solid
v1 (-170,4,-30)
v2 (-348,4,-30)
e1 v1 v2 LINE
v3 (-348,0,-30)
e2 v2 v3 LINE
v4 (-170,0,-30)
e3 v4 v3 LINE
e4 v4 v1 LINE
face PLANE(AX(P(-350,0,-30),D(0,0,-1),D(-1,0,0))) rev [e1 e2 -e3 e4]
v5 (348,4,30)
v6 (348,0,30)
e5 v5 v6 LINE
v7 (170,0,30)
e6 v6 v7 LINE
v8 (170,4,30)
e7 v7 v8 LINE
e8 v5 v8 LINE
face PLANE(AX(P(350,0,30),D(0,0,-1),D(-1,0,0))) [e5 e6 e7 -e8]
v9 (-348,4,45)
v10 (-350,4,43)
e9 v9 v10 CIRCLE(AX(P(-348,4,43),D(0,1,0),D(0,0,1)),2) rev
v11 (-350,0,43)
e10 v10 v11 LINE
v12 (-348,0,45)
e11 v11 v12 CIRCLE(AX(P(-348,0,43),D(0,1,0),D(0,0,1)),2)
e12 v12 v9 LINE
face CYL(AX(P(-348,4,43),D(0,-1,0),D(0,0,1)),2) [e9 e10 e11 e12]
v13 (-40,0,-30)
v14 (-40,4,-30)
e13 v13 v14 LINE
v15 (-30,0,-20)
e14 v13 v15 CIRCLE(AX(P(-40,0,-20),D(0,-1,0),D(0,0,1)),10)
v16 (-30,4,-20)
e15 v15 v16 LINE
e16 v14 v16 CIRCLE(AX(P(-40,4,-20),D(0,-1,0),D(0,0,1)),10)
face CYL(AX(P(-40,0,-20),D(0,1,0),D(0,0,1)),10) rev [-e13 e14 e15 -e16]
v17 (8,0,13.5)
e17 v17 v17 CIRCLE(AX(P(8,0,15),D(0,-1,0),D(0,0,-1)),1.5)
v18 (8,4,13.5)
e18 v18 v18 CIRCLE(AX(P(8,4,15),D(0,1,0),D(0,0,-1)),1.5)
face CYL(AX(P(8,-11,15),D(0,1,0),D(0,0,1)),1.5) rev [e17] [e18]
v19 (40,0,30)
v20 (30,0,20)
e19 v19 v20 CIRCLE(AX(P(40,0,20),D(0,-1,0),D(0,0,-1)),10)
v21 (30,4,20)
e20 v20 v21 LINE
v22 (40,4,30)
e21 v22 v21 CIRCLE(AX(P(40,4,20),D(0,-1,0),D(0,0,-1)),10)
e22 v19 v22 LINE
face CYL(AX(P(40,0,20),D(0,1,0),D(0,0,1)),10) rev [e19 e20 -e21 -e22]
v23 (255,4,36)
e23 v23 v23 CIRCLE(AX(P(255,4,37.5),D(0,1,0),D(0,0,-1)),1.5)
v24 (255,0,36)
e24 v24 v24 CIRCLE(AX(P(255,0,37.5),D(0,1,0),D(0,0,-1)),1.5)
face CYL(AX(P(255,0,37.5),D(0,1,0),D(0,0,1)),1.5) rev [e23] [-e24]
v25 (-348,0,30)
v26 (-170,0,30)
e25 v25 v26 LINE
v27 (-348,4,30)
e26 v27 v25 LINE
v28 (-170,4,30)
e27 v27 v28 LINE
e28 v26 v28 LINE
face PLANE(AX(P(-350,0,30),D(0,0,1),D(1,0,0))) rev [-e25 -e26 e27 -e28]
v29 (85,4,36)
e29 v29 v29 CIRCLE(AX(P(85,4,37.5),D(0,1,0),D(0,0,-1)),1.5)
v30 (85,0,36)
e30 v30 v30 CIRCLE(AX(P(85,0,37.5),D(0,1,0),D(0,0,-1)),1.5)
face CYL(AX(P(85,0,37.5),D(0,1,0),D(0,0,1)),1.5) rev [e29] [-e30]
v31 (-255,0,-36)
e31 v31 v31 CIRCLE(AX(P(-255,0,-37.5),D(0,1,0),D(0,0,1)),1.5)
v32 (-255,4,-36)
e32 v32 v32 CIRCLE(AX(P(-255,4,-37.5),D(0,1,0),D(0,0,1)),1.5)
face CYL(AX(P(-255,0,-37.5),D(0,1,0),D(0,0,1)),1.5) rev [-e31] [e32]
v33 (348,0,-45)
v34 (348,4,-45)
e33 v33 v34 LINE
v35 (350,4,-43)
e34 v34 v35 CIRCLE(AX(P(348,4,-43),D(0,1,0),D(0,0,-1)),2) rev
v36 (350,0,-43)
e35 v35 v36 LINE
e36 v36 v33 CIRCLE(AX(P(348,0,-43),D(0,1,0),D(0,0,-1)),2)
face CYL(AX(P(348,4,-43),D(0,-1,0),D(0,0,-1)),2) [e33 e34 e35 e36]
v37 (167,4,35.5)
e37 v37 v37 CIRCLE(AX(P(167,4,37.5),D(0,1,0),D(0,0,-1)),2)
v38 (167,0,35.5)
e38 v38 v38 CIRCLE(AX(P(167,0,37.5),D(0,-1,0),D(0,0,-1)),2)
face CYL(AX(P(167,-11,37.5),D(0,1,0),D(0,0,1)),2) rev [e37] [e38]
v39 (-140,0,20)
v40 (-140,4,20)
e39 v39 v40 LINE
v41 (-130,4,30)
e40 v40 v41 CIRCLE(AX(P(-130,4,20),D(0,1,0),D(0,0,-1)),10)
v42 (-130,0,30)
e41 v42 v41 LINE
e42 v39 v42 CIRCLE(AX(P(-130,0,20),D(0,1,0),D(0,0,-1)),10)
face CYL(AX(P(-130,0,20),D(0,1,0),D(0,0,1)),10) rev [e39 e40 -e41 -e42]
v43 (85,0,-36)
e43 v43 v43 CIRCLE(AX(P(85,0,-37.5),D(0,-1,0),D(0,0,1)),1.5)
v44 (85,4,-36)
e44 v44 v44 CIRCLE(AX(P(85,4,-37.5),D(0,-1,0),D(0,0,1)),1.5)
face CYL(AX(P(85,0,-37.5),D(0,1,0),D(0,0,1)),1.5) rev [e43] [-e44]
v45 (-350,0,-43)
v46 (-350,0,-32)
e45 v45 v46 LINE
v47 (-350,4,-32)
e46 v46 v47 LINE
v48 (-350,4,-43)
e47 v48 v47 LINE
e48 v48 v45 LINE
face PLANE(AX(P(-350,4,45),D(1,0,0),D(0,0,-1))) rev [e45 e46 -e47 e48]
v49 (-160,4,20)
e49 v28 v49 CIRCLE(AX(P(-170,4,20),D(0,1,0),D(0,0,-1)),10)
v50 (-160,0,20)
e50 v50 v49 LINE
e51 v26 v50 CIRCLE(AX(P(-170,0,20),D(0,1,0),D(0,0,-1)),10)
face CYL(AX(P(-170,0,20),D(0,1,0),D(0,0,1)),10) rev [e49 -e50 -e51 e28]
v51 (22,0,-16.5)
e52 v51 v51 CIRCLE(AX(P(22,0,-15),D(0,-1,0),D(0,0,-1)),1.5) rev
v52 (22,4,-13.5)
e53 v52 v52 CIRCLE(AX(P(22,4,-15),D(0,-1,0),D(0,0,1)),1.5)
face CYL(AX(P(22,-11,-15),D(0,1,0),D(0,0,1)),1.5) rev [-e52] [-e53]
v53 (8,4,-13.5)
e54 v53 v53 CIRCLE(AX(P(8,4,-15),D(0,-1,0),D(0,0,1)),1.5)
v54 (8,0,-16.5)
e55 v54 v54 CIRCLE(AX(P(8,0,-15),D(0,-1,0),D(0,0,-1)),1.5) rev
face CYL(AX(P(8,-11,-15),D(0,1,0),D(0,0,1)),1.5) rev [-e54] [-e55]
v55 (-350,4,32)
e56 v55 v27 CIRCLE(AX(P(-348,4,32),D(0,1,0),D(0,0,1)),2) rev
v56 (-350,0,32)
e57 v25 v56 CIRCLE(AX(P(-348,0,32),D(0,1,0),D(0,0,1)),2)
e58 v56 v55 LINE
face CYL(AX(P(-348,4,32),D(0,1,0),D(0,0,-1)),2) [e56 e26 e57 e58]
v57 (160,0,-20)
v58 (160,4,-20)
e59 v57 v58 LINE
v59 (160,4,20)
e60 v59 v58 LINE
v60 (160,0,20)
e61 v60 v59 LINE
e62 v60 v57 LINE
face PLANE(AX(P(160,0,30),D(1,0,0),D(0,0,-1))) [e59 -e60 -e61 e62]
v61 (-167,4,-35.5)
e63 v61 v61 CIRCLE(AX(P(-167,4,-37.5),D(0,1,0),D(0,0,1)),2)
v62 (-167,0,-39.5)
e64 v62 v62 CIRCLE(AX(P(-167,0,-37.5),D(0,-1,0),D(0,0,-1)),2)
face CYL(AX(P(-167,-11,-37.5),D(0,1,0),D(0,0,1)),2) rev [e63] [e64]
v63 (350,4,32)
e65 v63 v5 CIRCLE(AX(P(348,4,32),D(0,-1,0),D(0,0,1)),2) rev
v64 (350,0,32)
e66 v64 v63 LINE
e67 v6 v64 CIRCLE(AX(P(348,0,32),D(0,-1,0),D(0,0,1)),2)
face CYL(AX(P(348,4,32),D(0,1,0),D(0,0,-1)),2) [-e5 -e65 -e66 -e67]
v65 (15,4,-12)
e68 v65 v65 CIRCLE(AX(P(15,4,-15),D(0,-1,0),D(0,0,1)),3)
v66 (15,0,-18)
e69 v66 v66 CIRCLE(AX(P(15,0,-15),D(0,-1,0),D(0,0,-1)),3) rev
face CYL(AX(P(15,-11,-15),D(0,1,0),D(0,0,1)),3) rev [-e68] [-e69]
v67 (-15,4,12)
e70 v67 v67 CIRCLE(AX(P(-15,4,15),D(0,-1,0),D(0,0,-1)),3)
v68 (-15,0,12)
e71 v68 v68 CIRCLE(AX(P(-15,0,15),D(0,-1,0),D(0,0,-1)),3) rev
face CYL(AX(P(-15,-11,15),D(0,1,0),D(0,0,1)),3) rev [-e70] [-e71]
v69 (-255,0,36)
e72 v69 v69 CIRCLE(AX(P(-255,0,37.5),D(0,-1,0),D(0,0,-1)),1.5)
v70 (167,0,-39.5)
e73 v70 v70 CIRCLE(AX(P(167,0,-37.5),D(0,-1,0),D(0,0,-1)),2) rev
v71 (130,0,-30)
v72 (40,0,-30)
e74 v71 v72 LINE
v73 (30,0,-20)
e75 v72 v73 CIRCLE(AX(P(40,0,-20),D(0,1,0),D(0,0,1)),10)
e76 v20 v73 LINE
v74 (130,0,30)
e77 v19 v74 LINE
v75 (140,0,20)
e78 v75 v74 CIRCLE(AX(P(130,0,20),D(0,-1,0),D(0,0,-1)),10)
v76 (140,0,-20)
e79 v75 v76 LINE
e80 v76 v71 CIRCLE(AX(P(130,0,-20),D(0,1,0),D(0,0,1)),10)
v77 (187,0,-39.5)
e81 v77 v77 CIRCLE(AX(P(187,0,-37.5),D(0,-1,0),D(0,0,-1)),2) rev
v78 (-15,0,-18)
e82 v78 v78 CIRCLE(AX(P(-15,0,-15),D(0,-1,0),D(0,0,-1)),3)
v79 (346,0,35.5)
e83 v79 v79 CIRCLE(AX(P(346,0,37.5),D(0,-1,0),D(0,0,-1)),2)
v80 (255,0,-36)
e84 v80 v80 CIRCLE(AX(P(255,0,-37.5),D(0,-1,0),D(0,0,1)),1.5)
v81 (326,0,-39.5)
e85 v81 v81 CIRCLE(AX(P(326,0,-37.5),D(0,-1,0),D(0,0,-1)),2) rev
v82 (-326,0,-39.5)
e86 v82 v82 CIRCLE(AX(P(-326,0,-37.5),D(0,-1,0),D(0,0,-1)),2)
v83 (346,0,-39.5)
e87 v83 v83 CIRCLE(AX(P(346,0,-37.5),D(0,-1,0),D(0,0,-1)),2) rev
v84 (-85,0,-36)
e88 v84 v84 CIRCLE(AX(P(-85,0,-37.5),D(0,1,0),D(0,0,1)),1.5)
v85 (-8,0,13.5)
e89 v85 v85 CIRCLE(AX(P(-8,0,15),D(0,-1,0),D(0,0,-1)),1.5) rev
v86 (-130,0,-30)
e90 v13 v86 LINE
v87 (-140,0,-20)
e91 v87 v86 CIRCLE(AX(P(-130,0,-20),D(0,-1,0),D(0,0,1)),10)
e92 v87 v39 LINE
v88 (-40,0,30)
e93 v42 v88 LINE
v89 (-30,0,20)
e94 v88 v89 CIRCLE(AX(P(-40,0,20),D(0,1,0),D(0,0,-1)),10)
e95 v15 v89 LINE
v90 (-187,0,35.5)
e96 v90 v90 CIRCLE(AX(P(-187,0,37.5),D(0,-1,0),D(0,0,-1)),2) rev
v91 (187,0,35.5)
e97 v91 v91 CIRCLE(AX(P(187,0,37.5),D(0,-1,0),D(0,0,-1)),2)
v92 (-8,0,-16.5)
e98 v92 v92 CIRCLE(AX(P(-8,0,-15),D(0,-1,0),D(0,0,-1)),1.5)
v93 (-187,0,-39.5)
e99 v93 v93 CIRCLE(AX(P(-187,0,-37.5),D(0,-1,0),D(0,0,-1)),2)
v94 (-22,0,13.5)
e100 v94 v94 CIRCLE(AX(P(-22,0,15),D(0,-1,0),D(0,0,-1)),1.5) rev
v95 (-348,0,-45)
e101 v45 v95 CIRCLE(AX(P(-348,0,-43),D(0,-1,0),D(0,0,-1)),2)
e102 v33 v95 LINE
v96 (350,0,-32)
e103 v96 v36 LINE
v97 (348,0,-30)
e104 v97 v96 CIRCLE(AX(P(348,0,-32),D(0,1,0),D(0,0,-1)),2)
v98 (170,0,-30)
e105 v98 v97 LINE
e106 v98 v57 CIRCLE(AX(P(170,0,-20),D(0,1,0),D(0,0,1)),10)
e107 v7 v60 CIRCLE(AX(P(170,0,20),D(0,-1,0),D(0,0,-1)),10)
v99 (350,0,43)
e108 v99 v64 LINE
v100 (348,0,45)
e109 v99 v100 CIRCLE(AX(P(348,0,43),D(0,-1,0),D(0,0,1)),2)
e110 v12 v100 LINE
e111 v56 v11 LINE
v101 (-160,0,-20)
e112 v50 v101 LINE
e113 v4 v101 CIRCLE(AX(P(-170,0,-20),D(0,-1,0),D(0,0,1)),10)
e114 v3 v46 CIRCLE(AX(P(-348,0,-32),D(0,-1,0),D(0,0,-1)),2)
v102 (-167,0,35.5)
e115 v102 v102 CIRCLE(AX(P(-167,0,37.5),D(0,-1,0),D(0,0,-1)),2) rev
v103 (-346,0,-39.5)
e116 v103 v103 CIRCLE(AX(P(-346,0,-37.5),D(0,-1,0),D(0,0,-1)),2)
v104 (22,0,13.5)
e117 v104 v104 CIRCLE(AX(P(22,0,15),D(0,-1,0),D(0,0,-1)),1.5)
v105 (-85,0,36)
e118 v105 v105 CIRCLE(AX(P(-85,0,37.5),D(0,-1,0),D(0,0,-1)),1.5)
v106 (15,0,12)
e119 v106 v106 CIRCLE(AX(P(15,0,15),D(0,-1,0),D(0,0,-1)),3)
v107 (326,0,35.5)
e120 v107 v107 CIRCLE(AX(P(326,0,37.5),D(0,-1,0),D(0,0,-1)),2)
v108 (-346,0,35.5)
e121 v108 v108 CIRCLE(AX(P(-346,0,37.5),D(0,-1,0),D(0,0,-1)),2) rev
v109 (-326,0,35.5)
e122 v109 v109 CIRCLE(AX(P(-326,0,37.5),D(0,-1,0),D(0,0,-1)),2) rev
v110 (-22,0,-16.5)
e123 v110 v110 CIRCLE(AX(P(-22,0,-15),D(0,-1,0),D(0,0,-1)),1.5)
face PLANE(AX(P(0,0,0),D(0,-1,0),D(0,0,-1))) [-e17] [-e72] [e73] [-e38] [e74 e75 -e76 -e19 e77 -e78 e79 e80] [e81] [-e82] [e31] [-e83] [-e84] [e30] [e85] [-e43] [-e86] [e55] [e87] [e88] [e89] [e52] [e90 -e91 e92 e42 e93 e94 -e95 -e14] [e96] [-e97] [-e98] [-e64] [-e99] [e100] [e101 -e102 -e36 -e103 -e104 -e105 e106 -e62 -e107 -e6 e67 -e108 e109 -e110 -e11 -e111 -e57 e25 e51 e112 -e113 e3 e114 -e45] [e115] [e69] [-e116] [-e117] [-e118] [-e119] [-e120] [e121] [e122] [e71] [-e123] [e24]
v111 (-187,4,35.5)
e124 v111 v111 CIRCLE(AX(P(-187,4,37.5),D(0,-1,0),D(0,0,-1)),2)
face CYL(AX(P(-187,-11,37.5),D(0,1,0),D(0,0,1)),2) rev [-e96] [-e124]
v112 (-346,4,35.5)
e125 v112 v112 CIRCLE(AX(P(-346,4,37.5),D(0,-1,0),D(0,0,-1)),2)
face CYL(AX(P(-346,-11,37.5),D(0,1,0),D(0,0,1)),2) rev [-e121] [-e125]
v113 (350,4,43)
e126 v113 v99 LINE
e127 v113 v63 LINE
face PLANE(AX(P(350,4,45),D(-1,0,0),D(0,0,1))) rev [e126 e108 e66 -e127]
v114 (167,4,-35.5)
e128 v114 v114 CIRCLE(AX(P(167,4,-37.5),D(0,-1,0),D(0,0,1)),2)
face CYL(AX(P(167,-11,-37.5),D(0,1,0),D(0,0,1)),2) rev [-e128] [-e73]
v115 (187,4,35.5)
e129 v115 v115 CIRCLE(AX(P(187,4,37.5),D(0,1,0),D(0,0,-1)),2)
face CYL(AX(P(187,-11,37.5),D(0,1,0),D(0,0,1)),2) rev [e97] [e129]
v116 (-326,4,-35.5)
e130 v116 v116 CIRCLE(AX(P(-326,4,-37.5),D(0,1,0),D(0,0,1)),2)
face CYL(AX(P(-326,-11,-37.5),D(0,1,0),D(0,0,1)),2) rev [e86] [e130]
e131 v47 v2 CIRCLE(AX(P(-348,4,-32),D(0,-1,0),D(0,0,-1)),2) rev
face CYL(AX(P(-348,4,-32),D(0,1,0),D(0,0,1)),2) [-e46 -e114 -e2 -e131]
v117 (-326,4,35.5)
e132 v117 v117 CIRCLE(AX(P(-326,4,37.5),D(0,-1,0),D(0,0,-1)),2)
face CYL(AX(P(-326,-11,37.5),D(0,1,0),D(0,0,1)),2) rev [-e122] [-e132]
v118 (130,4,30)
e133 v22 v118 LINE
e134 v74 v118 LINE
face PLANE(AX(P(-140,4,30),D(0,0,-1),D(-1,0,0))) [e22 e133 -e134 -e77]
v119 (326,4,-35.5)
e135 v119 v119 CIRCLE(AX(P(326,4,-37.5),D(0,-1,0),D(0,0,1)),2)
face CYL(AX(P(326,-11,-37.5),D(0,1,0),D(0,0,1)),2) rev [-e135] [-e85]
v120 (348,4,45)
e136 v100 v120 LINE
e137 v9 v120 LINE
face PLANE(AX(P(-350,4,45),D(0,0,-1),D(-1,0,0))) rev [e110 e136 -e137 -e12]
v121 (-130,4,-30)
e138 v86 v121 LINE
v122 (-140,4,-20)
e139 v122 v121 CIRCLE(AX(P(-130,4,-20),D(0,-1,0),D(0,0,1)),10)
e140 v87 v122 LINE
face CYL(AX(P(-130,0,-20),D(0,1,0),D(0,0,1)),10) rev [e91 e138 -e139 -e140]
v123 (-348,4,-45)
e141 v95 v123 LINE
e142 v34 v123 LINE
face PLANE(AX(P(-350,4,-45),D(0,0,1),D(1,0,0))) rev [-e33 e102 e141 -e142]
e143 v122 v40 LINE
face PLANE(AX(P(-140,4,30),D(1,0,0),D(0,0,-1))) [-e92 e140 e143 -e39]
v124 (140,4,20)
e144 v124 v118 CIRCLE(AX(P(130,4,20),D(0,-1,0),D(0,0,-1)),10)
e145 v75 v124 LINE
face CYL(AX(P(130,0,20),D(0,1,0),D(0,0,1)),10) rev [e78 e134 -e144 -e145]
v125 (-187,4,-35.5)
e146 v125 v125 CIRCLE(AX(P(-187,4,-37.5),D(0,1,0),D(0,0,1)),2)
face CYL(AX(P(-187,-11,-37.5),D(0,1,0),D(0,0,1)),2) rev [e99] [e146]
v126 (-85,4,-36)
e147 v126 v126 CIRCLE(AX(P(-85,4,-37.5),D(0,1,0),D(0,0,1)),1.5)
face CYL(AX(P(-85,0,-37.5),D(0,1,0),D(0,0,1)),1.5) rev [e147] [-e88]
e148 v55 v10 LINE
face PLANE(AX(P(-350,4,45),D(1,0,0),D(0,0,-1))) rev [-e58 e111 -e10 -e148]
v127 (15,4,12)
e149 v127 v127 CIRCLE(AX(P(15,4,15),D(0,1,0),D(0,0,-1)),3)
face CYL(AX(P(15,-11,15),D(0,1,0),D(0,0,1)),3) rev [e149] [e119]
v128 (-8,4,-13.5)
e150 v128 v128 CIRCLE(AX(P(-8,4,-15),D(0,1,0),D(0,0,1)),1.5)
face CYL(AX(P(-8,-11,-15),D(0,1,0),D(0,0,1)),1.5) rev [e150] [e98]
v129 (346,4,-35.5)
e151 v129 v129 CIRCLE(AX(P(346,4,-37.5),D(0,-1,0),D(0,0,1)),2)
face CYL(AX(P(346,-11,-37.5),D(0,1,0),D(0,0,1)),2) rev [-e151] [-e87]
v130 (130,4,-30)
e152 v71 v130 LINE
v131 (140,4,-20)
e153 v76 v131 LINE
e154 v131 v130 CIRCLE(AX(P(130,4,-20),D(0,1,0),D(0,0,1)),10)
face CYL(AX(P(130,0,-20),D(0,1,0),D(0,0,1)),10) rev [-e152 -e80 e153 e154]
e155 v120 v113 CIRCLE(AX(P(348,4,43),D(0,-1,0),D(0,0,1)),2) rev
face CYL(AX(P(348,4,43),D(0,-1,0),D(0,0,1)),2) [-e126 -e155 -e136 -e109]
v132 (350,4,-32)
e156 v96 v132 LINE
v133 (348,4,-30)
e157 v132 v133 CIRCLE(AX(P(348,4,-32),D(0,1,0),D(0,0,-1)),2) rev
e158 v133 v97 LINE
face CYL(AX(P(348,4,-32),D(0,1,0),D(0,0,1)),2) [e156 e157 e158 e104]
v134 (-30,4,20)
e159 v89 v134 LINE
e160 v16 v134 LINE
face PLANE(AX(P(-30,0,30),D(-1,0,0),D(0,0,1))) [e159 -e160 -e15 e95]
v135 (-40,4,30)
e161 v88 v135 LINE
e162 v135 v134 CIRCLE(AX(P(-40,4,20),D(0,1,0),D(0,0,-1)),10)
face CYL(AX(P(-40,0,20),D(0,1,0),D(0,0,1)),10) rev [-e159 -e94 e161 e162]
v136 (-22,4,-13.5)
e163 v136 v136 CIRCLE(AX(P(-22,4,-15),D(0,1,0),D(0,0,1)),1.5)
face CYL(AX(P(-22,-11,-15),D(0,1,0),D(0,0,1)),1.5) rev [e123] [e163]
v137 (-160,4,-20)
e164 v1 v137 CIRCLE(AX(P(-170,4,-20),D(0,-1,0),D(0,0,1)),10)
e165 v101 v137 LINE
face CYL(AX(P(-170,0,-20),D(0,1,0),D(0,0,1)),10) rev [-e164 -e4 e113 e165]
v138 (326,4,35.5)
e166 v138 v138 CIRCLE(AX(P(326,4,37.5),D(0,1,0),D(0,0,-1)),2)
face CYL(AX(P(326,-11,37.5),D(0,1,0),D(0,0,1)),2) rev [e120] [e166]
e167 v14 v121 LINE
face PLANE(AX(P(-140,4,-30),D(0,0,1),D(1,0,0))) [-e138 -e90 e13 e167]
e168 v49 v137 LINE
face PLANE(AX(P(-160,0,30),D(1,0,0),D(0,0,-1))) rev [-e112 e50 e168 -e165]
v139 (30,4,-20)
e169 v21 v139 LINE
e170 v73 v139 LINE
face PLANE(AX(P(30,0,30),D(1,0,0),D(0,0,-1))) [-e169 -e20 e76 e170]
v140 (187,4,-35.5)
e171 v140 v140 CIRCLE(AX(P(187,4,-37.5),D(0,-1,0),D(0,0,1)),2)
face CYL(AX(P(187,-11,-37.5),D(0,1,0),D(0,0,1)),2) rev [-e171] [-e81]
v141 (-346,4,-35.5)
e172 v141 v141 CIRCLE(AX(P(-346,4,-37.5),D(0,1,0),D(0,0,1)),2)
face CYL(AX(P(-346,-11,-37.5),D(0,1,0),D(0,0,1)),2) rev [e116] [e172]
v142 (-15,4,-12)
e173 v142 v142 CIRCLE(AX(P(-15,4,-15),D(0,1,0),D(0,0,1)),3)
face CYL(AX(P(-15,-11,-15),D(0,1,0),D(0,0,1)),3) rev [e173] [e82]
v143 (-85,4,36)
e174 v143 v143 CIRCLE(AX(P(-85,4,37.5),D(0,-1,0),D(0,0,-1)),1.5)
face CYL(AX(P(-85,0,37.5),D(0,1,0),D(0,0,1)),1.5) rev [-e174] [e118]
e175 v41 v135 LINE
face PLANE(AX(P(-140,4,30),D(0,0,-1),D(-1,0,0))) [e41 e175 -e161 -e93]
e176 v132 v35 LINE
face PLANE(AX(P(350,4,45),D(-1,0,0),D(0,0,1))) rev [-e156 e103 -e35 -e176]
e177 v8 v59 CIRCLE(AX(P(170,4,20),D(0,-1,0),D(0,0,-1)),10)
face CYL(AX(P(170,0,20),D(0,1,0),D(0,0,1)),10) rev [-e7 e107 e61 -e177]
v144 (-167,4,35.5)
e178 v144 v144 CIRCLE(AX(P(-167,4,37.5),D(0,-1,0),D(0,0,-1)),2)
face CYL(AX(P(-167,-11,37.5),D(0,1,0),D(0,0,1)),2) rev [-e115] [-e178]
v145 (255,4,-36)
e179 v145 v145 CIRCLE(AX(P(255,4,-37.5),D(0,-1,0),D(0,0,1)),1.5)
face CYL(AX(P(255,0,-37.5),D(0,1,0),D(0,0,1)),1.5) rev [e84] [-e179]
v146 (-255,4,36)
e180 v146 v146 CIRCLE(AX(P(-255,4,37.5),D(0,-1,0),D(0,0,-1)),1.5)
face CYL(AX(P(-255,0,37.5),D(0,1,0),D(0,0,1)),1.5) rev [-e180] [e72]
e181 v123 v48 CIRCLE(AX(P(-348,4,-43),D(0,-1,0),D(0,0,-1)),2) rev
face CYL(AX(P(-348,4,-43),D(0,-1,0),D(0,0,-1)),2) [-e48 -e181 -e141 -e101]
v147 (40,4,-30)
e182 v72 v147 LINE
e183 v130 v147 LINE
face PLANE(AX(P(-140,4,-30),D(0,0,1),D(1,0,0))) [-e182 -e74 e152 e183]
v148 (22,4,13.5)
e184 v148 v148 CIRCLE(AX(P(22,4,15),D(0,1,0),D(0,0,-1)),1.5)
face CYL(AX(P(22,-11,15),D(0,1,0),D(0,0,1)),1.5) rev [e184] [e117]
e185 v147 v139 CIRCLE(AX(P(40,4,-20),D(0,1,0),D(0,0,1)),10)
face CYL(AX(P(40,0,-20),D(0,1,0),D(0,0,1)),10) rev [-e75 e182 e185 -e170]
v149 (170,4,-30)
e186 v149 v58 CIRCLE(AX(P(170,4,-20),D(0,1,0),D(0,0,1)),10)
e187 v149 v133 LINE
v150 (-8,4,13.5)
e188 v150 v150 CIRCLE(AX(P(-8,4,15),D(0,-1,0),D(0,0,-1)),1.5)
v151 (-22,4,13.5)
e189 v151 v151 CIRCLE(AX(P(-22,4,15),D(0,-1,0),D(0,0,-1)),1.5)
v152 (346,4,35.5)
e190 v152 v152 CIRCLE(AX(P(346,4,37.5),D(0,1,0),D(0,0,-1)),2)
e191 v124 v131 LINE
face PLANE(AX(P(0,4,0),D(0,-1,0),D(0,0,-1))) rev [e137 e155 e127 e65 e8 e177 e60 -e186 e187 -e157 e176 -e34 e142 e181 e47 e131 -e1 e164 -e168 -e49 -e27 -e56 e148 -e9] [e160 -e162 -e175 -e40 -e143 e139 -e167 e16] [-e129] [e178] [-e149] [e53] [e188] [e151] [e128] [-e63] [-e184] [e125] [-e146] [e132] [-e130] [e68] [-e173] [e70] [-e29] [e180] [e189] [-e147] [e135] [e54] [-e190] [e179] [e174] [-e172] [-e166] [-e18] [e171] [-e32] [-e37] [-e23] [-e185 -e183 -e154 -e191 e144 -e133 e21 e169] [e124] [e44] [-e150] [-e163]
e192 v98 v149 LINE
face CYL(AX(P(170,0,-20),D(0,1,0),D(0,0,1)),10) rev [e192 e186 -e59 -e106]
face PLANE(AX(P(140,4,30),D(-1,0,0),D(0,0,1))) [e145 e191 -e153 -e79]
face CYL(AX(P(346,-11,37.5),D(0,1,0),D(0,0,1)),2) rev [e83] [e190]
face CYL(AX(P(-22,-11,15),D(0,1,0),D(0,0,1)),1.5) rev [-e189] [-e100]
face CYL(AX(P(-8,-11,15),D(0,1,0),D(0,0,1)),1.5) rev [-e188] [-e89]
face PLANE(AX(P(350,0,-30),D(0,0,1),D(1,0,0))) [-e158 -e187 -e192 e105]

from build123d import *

# Parameters (mm, degrees)
SKETCH_1_W                                   = 700
SKETCH_1_H                                   = 90
SKETCH_1_W_2                                 = 280
SKETCH_1_H_2                                 = 60
EXTRUDE_1_DEPTH                              = 4
SKETCH_2_W                                   = 190
SKETCH_2_H                                   = 60
CUT_EXTRUDE_1_DEPTH                          = 4
SKETCH_4_R                                   = 2
CUT_EXTRUDE_2_DEPTH                          = 15
MIRROR_2_AT_THE_SECOND_PLANE_COPY_1_SKET_R   = 2
MIRROR_2_AT_THE_SECOND_PLANE_COPY_1_DEPTH    = 15
SKETCH_5_W                                   = 60
SKETCH_5_H                                   = 60
EXTRUDE_2_DEPTH                              = 4
SKETCH_6_R                                   = 1.5
CUT_EXTRUDE_3_DEPTH                          = 4
MIRROR_3_AT_THE_SECOND_PLANE_COPY_1_SKET_R   = 1.5
MIRROR_3_AT_THE_SECOND_PLANE_COPY_1_DEPTH    = 4
FILLET_1_R                                   = 2
MIRROR_6_DEPTH                               = 4
EXTRUDE_3_DEPTH                              = 4
MIRROR_9_AT_THE_SECOND_PLANE_COPY_1_DEPTH    = 4
SKETCH_8_R                                   = 3
SKETCH_8_R_2                                 = 1.5
CUT_EXTRUDE_4_DEPTH                          = 15
MIRROR_10_AT_THE_SECOND_PLANE_COPY_1_SKE_R   = 3
MIRROR_10_AT_THE_SECOND_PLANE_COPY_1_SKE_R_2 = 1.5
MIRROR_10_AT_THE_SECOND_PLANE_COPY_1_DEPTH   = 15


# Read off the part's stored shape, not the designer's step: 镜向6
with BuildPart() as part:
    # 草图1 → 凸台-拉伸1 (new body)
    with BuildSketch(Plane(origin=(0, 0, 0), x_dir=(1, 0, 0), z_dir=(0, 1, 0))):
        Rectangle(SKETCH_1_W, SKETCH_1_H)
        Rectangle(SKETCH_1_W_2, SKETCH_1_H_2, mode=Mode.SUBTRACT)
    extrude(amount=EXTRUDE_1_DEPTH)

    # 草图2 → 切除-拉伸1 (cut)
    with BuildSketch(Plane(origin=(0, 4, 0), x_dir=(1, 0, 0), z_dir=(0, 1, 0))):
        with Locations((-255, 0)):
            Rectangle(SKETCH_2_W, SKETCH_2_H)
    cut_extrude_1 = extrude(amount=-CUT_EXTRUDE_1_DEPTH, mode=Mode.SUBTRACT)

    # 镜向1: 切除-拉伸1 across plane
    add(cut_extrude_1.mirror(Plane(origin=(0, 0, 0), x_dir=(0, 0, 1), z_dir=(1, 0, 0))), mode=Mode.SUBTRACT)

    # 草图4 → 切除-拉伸2 (cut)
    with BuildSketch(Plane(origin=(0, 4, 0), x_dir=(1, 0, 0), z_dir=(0, 1, 0))):
        with Locations(Location((-187, 37.5, 0), (0, 0, 270))):
            Circle(SKETCH_4_R)
        with Locations(Location((-167, 37.5, 0), (0, 0, 270))):
            Circle(SKETCH_4_R)
        with Locations(Location((-346, 37.5, 0), (0, 0, 270))):
            Circle(SKETCH_4_R)
        with Locations(Location((-326, 37.5, 0), (0, 0, 270))):
            Circle(SKETCH_4_R)
    cut_extrude_2 = extrude(amount=-CUT_EXTRUDE_2_DEPTH, mode=Mode.SUBTRACT)

    # 镜向2: 切除-拉伸2 across plane
    add(cut_extrude_2.mirror(Plane(origin=(0, 0, 0), x_dir=(0, 0, 1), z_dir=(1, 0, 0))), mode=Mode.SUBTRACT)

    # 镜向2 at the second plane: 切除-拉伸2 across plane
    add(cut_extrude_2.mirror(Plane.XY), mode=Mode.SUBTRACT)

    # 镜向2 at the second plane copy 1 sket → 镜向2 at the second plane copy 1 (cut)
    with BuildSketch(Plane(origin=(0, 4, 0), x_dir=(-1, 0, 0), z_dir=(0, 1, 0))):
        with Locations(Location((-187, 37.5, 0), (0, 0, 270))):
            Circle(MIRROR_2_AT_THE_SECOND_PLANE_COPY_1_SKET_R)
        with Locations(Location((-167, 37.5, 0), (0, 0, 270))):
            Circle(MIRROR_2_AT_THE_SECOND_PLANE_COPY_1_SKET_R)
        with Locations(Location((-346, 37.5, 0), (0, 0, 270))):
            Circle(MIRROR_2_AT_THE_SECOND_PLANE_COPY_1_SKET_R)
        with Locations(Location((-326, 37.5, 0), (0, 0, 270))):
            Circle(MIRROR_2_AT_THE_SECOND_PLANE_COPY_1_SKET_R)
    extrude(amount=-MIRROR_2_AT_THE_SECOND_PLANE_COPY_1_DEPTH, mode=Mode.SUBTRACT)

    # 草图5 → 凸台-拉伸2 (add)
    with BuildSketch(Plane(origin=(0, 4, 0), x_dir=(1, 0, 0), z_dir=(0, 1, 0))):
        Rectangle(SKETCH_5_W, SKETCH_5_H)
    extrude(amount=-EXTRUDE_2_DEPTH)

    # 草图6 → 切除-拉伸3 (cut)
    with BuildSketch(Plane(origin=(0, 4, 0), x_dir=(1, 0, 0), z_dir=(0, 1, 0))):
        with Locations(Location((-255, 37.5, 0), (0, 0, 270))):
            Circle(SKETCH_6_R)
        with Locations(Location((-85, 37.5, 0), (0, 0, 270))):
            Circle(SKETCH_6_R)
    cut_extrude_3 = extrude(amount=-CUT_EXTRUDE_3_DEPTH, mode=Mode.SUBTRACT)

    # 镜向3: 切除-拉伸3 across plane
    add(cut_extrude_3.mirror(Plane.XY), mode=Mode.SUBTRACT)

    # 镜向3 at the second plane: 切除-拉伸3 across plane
    add(cut_extrude_3.mirror(Plane(origin=(0, 0, 0), x_dir=(0, 0, 1), z_dir=(1, 0, 0))), mode=Mode.SUBTRACT)

    # 镜向3 at the second plane copy 1 sket → 镜向3 at the second plane copy 1 (cut)
    with BuildSketch(Plane(origin=(0, 4, 0), x_dir=(-1, 0, 0), z_dir=(0, 1, 0))):
        with Locations(Location((-255, 37.5, 0), (0, 0, 270))):
            Circle(MIRROR_3_AT_THE_SECOND_PLANE_COPY_1_SKET_R)
        with Locations(Location((-85, 37.5, 0), (0, 0, 270))):
            Circle(MIRROR_3_AT_THE_SECOND_PLANE_COPY_1_SKET_R)
    extrude(amount=-MIRROR_3_AT_THE_SECOND_PLANE_COPY_1_DEPTH, mode=Mode.SUBTRACT)

    # 圆角1
    fillet_1_edges = [part.edges().sort_by_distance(p)[0] for p in [
        (-350, 2, -30),
        (-350, 2, -45),
    ]]
    fillet(fillet_1_edges, radius=FILLET_1_R)

    # 镜向6 outline → 镜向6 (cut)
    with BuildSketch(Plane(origin=(0, 0, 0), x_dir=(1, 0, 0), z_dir=(0, 1, 0))):
        with BuildLine():
            Line((350, 45), (348, 45))
            ThreePointArc((348, 45), (349.414213562, 44.414213562), (350, 43))
            Line((350, 43), (350, 45))
        make_face()
        with BuildLine():
            Line((350, 30), (350, 32))
            ThreePointArc((350, 32), (349.414213562, 30.585786438), (348, 30))
            Line((348, 30), (350, 30))
        make_face()
        with BuildLine():
            Line((-350, -45), (-348, -45))
            ThreePointArc((-348, -45), (-349.414213562, -44.414213562), (-350, -43))
            Line((-350, -43), (-350, -45))
        make_face()
        with BuildLine():
            ThreePointArc((348, -30), (349.414213562, -30.585786438), (350, -32))
            Line((350, -32), (350, -30))
            Line((350, -30), (348, -30))
        make_face()
        with BuildLine():
            ThreePointArc((350, -43), (349.414213562, -44.414213562), (348, -45))
            Line((348, -45), (350, -45))
            Line((350, -45), (350, -43))
        make_face()
        with BuildLine():
            Line((-350, -30), (-350, -32))
            ThreePointArc((-350, -32), (-349.414213562, -30.585786438), (-348, -30))
            Line((-348, -30), (-350, -30))
        make_face()
    extrude(amount=MIRROR_6_DEPTH, mode=Mode.SUBTRACT)

    # 草图7 → 凸台-拉伸3 (add)
    with BuildSketch(Plane(origin=(0, 4, 0), x_dir=(1, 0, 0), z_dir=(0, 1, 0))):
        with BuildLine():
            Line((-170, 30), (-160, 30))
            Line((-160, 30), (-160, 20))
            ThreePointArc((-160, 20), (-162.928932188, 27.071067812), (-170, 30))
        make_face()
        with BuildLine():
            Line((-140, 20), (-140, 30))
            Line((-140, 30), (-130, 30))
            ThreePointArc((-130, 30), (-137.071067812, 27.071067812), (-140, 20))
        make_face()
        with BuildLine():
            Line((-40, 30), (-30, 30))
            Line((-30, 30), (-30, 20))
            ThreePointArc((-30, 20), (-32.928932188, 27.071067812), (-40, 30))
        make_face()
    extrude_3 = extrude(amount=-EXTRUDE_3_DEPTH)

    # 镜向9: 凸台-拉伸3 across plane
    add(extrude_3.mirror(Plane(origin=(0, 0, 0), x_dir=(0, 0, 1), z_dir=(1, 0, 0))))

    # 镜向9 at the second plane: 凸台-拉伸3 across plane
    add(extrude_3.mirror(Plane.XY))

    # 镜向9 at the second plane copy 1 sket → 镜向9 at the second plane copy 1 (add)
    with BuildSketch(Plane(origin=(0, 4, 0), x_dir=(-1, 0, 0), z_dir=(0, 1, 0))):
        with BuildLine():
            Line((-170, 30), (-160, 30))
            Line((-160, 30), (-160, 20))
            ThreePointArc((-160, 20), (-162.928932188, 27.071067812), (-170, 30))
        make_face()
        with BuildLine():
            Line((-140, 20), (-140, 30))
            Line((-140, 30), (-130, 30))
            ThreePointArc((-130, 30), (-137.071067812, 27.071067812), (-140, 20))
        make_face()
        with BuildLine():
            Line((-40, 30), (-30, 30))
            Line((-30, 30), (-30, 20))
            ThreePointArc((-30, 20), (-32.928932188, 27.071067812), (-40, 30))
        make_face()
    extrude(amount=-MIRROR_9_AT_THE_SECOND_PLANE_COPY_1_DEPTH)

    # 草图8 → 切除-拉伸4 (cut)
    with BuildSketch(Plane(origin=(0, 4, 0), x_dir=(1, 0, 0), z_dir=(0, 1, 0))):
        with Locations(Location((-15, 15, 0), (0, 0, 270))):
            Circle(SKETCH_8_R)
        with Locations(Location((-22, 15, 0), (0, 0, 270))):
            Circle(SKETCH_8_R_2)
        with Locations(Location((-8, 15, 0), (0, 0, 270))):
            Circle(SKETCH_8_R_2)
    cut_extrude_4 = extrude(amount=-CUT_EXTRUDE_4_DEPTH, mode=Mode.SUBTRACT)

    # 镜向10: 切除-拉伸4 across plane
    add(cut_extrude_4.mirror(Plane.XY), mode=Mode.SUBTRACT)

    # 镜向10 at the second plane: 切除-拉伸4 across plane
    add(cut_extrude_4.mirror(Plane(origin=(0, 0, 0), x_dir=(0, 0, 1), z_dir=(1, 0, 0))), mode=Mode.SUBTRACT)

    # 镜向10 at the second plane copy 1 ske → 镜向10 at the second plane copy 1 (cut)
    with BuildSketch(Plane(origin=(0, 4, 0), x_dir=(-1, 0, 0), z_dir=(0, 1, 0))):
        with Locations(Location((-15, 15, 0), (0, 0, 270))):
            Circle(MIRROR_10_AT_THE_SECOND_PLANE_COPY_1_SKE_R)
        with Locations(Location((-22, 15, 0), (0, 0, 270))):
            Circle(MIRROR_10_AT_THE_SECOND_PLANE_COPY_1_SKE_R_2)
        with Locations(Location((-8, 15, 0), (0, 0, 270))):
            Circle(MIRROR_10_AT_THE_SECOND_PLANE_COPY_1_SKE_R_2)
    extrude(amount=-MIRROR_10_AT_THE_SECOND_PLANE_COPY_1_DEPTH, mode=Mode.SUBTRACT)


solid = part.part
